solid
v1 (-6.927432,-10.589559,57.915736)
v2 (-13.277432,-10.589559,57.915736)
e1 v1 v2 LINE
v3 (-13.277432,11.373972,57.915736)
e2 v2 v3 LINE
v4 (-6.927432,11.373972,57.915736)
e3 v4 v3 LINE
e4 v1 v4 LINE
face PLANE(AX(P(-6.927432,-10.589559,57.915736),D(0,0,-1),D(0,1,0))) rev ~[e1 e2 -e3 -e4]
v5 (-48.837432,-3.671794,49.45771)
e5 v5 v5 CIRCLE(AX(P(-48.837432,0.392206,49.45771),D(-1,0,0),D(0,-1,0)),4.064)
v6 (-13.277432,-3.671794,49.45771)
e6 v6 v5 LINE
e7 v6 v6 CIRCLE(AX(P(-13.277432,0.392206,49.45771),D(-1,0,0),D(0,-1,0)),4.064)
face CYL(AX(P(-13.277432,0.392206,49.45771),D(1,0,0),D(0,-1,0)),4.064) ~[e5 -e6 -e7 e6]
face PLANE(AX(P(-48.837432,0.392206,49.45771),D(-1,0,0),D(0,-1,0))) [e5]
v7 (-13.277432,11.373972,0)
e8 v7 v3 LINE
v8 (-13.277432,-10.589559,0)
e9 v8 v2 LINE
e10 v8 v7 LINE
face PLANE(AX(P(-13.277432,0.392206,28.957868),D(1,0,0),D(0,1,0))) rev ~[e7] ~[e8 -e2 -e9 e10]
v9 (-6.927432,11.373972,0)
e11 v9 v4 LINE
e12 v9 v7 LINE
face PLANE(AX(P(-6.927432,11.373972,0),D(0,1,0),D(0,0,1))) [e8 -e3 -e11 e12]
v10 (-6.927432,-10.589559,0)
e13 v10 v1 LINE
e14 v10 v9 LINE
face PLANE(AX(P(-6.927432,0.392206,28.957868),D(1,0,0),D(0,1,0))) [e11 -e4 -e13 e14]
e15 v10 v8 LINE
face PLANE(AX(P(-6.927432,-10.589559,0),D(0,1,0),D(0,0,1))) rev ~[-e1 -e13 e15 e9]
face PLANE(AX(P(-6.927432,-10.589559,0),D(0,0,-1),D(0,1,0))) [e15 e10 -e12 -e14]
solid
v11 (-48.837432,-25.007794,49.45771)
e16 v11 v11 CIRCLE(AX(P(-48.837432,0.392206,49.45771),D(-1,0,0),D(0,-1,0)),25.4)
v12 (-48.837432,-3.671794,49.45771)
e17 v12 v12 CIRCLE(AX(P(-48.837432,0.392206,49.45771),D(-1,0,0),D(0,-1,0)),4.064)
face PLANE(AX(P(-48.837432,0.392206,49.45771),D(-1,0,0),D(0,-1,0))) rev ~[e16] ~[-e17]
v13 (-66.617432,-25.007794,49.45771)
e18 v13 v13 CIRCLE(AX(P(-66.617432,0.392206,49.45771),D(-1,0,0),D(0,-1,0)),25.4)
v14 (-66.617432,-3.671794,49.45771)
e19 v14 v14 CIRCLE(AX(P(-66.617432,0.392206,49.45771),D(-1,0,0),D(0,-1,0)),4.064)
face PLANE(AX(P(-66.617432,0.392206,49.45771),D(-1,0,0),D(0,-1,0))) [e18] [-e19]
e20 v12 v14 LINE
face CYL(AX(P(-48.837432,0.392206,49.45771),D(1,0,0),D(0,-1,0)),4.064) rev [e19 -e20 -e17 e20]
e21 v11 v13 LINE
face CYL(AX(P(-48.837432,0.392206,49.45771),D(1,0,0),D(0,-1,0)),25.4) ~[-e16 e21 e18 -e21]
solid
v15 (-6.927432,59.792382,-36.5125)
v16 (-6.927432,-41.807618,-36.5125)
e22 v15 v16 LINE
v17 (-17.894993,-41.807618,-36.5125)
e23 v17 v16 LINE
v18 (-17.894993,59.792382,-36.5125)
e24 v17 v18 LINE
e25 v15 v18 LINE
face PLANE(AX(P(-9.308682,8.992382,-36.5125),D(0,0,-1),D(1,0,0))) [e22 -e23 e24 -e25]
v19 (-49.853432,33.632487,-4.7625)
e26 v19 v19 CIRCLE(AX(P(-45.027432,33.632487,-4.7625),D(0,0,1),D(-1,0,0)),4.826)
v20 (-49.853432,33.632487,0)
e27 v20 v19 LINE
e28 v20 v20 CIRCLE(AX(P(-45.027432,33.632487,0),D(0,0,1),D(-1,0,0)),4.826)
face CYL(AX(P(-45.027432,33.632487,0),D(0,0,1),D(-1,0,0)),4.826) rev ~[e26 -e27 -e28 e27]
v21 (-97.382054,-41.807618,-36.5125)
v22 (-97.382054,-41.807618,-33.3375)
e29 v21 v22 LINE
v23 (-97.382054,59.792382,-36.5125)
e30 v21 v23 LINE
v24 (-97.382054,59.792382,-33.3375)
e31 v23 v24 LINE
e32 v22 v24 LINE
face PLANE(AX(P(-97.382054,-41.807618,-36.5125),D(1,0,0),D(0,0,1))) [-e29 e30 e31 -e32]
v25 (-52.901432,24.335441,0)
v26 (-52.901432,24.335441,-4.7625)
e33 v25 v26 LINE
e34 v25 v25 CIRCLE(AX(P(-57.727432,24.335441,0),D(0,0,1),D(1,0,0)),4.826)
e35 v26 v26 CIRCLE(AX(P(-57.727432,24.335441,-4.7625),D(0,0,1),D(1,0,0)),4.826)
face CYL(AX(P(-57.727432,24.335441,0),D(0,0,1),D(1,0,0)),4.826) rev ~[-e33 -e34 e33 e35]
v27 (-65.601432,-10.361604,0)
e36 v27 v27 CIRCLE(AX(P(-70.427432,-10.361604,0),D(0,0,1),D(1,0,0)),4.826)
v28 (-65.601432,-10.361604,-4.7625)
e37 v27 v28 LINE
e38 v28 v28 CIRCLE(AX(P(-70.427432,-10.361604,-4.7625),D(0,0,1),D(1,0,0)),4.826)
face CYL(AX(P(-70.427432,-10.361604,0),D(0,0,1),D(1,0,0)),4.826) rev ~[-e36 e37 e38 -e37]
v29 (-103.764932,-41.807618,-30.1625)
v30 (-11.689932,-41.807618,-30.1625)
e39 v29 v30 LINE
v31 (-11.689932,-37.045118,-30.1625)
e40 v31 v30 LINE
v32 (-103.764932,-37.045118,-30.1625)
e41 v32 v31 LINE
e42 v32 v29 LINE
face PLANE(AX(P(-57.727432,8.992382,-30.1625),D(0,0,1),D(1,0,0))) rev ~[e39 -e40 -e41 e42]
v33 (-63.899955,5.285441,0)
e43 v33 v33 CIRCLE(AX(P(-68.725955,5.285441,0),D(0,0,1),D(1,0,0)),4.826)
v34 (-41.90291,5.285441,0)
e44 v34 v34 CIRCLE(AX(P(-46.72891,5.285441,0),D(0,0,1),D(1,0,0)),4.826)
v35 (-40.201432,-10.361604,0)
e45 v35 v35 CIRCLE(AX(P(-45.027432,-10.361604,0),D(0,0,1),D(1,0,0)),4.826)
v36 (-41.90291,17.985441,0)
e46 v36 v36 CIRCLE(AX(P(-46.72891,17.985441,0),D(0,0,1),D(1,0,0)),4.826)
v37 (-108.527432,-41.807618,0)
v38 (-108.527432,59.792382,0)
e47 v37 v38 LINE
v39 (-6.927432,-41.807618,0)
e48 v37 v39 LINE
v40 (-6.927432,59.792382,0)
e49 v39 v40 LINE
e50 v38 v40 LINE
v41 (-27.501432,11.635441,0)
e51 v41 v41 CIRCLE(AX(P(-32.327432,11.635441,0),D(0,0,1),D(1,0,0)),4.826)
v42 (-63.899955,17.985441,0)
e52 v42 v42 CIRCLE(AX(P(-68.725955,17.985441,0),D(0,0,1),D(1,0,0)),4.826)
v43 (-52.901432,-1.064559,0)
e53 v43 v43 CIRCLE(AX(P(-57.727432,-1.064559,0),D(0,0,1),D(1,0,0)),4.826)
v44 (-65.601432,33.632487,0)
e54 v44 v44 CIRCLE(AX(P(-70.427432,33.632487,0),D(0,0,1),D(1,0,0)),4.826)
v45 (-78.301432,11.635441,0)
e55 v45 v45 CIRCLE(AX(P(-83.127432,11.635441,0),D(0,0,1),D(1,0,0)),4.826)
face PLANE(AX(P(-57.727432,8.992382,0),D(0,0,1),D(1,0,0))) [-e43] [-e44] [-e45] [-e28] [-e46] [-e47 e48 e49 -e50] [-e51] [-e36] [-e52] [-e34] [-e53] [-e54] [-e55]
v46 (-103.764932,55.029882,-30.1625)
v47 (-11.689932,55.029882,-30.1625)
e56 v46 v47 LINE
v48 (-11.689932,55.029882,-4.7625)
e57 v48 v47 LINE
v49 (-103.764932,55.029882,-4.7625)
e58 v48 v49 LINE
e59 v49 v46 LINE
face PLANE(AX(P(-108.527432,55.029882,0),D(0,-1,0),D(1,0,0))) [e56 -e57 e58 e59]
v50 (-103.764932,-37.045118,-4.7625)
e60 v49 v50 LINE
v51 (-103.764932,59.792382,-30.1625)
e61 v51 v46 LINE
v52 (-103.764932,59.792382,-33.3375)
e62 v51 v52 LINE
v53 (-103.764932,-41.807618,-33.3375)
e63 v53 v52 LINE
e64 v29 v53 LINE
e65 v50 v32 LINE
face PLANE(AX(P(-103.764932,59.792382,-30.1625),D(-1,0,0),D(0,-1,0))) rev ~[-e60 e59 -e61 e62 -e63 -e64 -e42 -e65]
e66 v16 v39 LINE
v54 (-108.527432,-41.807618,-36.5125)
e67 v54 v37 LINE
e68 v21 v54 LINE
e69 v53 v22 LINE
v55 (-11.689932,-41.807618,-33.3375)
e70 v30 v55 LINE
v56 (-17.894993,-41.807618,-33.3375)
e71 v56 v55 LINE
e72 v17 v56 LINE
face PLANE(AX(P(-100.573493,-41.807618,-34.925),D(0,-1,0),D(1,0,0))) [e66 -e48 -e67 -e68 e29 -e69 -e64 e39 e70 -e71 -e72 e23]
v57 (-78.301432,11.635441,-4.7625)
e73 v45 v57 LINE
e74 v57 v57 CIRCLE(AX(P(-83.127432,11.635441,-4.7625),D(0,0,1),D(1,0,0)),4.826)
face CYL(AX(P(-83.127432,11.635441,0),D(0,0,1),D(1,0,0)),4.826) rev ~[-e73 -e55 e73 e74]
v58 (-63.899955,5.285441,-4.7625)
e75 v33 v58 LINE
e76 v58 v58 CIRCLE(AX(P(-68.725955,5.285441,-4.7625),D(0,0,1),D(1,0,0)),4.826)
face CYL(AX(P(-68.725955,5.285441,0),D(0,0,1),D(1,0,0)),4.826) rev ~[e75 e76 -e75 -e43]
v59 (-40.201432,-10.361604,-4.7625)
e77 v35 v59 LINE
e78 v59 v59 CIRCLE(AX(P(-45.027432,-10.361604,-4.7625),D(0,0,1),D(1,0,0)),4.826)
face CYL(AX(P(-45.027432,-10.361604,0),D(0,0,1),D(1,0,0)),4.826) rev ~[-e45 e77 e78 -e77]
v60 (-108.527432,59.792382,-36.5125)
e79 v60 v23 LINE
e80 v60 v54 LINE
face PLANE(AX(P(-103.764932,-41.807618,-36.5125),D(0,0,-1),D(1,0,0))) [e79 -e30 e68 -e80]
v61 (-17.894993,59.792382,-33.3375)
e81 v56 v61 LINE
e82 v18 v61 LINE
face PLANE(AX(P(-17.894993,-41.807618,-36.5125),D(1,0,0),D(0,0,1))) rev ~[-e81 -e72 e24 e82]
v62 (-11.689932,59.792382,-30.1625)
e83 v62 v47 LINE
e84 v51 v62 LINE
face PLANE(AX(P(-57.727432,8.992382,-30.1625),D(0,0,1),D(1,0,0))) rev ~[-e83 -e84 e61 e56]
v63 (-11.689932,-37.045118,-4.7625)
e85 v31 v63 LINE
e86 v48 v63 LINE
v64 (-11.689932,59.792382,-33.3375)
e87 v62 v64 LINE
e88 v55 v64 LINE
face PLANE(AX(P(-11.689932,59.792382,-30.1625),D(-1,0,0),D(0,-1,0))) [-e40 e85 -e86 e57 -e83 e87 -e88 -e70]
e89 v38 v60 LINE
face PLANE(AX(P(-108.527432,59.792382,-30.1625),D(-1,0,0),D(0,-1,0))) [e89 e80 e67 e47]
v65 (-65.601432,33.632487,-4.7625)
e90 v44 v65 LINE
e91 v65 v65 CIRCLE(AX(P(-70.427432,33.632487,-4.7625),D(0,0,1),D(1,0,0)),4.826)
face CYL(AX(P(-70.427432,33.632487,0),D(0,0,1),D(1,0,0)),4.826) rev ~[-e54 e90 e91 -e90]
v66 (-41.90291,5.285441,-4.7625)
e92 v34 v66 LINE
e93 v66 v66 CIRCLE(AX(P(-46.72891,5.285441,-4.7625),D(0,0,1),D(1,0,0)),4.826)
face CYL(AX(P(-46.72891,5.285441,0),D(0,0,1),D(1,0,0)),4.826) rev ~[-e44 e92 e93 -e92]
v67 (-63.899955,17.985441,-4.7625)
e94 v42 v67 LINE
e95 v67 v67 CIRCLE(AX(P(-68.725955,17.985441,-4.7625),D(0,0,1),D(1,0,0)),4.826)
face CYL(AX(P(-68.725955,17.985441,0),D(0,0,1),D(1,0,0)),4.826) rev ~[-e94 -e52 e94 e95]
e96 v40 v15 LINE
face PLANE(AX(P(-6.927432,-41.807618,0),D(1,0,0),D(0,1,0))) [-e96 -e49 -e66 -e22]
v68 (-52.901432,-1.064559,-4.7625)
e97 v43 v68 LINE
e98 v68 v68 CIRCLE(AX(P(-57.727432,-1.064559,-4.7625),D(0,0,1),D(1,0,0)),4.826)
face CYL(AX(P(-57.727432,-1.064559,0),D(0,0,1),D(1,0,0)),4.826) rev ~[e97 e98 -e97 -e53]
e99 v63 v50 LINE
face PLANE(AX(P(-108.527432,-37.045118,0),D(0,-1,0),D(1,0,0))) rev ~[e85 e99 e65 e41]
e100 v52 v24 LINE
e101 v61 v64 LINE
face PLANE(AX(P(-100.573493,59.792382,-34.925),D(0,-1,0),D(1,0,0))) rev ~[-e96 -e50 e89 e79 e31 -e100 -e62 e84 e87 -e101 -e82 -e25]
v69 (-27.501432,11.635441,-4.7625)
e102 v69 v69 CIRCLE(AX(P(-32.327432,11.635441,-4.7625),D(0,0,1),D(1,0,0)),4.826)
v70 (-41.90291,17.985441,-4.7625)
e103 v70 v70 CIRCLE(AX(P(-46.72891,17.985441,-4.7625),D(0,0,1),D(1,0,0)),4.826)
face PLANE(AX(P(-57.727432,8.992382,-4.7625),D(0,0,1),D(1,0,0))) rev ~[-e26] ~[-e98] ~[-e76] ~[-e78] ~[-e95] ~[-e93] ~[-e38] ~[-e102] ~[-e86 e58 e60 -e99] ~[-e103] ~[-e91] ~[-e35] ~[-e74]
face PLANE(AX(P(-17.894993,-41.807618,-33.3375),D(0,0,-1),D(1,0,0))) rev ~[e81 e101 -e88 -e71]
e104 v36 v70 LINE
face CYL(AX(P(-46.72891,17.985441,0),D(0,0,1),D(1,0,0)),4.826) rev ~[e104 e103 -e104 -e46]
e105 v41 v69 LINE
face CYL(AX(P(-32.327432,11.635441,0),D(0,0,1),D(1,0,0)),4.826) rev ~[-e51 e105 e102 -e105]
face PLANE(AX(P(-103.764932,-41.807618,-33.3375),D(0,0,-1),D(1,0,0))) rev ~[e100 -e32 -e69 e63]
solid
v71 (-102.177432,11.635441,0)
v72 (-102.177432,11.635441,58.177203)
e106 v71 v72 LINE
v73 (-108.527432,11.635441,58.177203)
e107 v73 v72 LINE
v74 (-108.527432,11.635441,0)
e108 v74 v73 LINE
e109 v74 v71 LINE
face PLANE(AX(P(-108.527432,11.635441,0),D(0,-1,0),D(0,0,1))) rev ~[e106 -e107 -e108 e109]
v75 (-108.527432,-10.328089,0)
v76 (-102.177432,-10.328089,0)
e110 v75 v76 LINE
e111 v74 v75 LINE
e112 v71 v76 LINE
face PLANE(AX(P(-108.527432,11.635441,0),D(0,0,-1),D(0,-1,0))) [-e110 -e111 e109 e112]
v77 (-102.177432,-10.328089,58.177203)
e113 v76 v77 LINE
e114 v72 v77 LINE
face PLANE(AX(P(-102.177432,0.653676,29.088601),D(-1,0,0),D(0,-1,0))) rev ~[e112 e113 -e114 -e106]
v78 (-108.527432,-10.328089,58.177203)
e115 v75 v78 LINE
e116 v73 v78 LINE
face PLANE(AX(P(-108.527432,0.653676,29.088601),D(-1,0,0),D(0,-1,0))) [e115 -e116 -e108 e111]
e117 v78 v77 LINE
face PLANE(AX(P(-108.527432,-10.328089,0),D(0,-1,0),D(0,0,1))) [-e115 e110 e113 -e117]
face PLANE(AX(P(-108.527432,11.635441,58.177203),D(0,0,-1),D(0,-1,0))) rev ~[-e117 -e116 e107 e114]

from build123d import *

# Parameters (mm, degrees)
F0_W      = 101.6
F0_H      = 101.6
F1_DEPTH  = 30.1625
F2_W      = 21.9635302201
F2_H      = 57.9157359898
F3_DEPTH  = 6.35
F4_W      = 21.9635302201
F4_H      = 58.17720294
F5_DEPTH  = 6.35
F7_T      = -4.7625
F6_R      = 4.826
F8_DEPTH  = 65.532
F9_W      = 4.7625
F9_H      = 101.6
F10_DEPTH = 6.35
F11_W     = 6.3828786112
F11_H     = 3.1750000536
F11_W_2   = 6.2050602607
F12_DEPTH = 101.6
F15_R     = 4.064
F16_DEPTH = 35.56
F17_R     = 25.4
F17_R_2   = 4.064
F18_DEPTH = 17.78


# Not quite as in the source:
# - the program builds the solid bodies; features that only make, move or delete a surface that nothing else refers to are left out


with BuildPart() as f1:
    # F0 (on Top) → F1 (new body)
    with BuildSketch(Plane.XY):
        with Locations((-57.7274323441, 8.9923822479)):
            Rectangle(F0_W, F0_H)
    extrude(amount=-F1_DEPTH)

    # F7
    f7_openings = [f1.faces().sort_by_distance(p)[0] for p in [
        (-57.727432, 8.992382, -30.1625),
    ]]
    offset(amount=F7_T, openings=f7_openings)

    # F6 (on face) → F8 (cut)
    with BuildSketch(Plane.XY):
        with Locations((-70.4274323441, 33.6324865892)):
            Circle(F6_R)
        with BuildLine():
            ThreePointArc((-40.2014323441, 33.6324865892), (-45.0274323441, 38.4584865892), (-49.8534323441, 33.6324865892))
            ThreePointArc((-49.8534323441, 33.6324865892), (-45.0274323441, 28.8064865892), (-40.2014323441, 33.6324865892))
        make_face()
        with Locations((-57.7274323441, 24.3354413331)):
            Circle(F6_R)
        with Locations((-46.728909716, 17.9854413331)):
            Circle(F6_R)
        with Locations((-46.728909716, 5.2854413331)):
            Circle(F6_R)
        with Locations((-32.3274323441, 11.6354413331)):
            Circle(F6_R)
        with Locations((-45.0274323441, -10.3616039231)):
            Circle(F6_R)
        with Locations((-57.7274323441, -1.0645586669)):
            Circle(F6_R)
        with Locations((-70.4274323441, -10.3616039231)):
            Circle(F6_R)
        with Locations((-68.7259549722, 5.2854413331)):
            Circle(F6_R)
        with Locations((-68.7259549722, 17.9854413331)):
            Circle(F6_R)
        with Locations((-83.1274323441, 11.6354413331)):
            Circle(F6_R)
    extrude(amount=-F8_DEPTH, mode=Mode.SUBTRACT)

    # F9 (on face) → F10 (join)
    with BuildSketch(Plane(origin=(0, 0, -30.1625), x_dir=(1, 0, 0), z_dir=(0, 0, -1))):
        with Locations((-106.1461823441, -8.9923822479)):
            Rectangle(F9_W, F9_H)
        with Locations((-9.3086823441, -8.9923822479)):
            Rectangle(F9_W, F9_H)
    extrude(amount=F10_DEPTH)

    # F11 (on face) → F12 (join)
    with BuildSketch(Plane.XZ.offset(41.8076177521)):
        with Locations((-100.5734930385, -34.9249999732)):
            Rectangle(F11_W, F11_H)
        with Locations((-14.7924624745, -34.9249999732)):
            Rectangle(F11_W_2, F11_H)
    extrude(amount=-F12_DEPTH)


with BuildPart() as f3:
    # F2 (on face) → F3 (new body)
    with BuildSketch(Plane.YZ.offset(-6.9274323441)):
        with Locations((0.3922064789, 28.9578679949)):
            Rectangle(F2_W, F2_H)
    extrude(amount=-F3_DEPTH)

    # F15 (on face) → F16 (join)
    with BuildSketch(Plane(origin=(-13.2774323441, 0, 0), x_dir=(0, -1, 0), z_dir=(-1, 0, 0))):
        with Locations((-0.3922064789, 49.4577102363)):
            Circle(F15_R)
    extrude(amount=F16_DEPTH)


with BuildPart() as f5:
    # F4 (on face) → F5 (new body)
    with BuildSketch(Plane(origin=(-108.5274323441, 0, 0), x_dir=(0, -1, 0), z_dir=(-1, 0, 0))):
        with Locations((-0.653676223, 29.08860147)):
            Rectangle(F4_W, F4_H)
    extrude(amount=-F5_DEPTH)


with BuildPart() as f18:
    # F17 (on face) → F18 (new body)
    with BuildSketch(Plane(origin=(-48.8374323441, 0, 0), x_dir=(0, -1, 0), z_dir=(-1, 0, 0))):
        with Locations((-0.3922064789, 49.4577102363)):
            Circle(F17_R)
        with Locations((-0.3922064789, 49.4577102363)):
            Circle(F17_R_2, mode=Mode.SUBTRACT)
    extrude(amount=F18_DEPTH)


solid = Compound([f1.part, f3.part, f5.part, f18.part])
